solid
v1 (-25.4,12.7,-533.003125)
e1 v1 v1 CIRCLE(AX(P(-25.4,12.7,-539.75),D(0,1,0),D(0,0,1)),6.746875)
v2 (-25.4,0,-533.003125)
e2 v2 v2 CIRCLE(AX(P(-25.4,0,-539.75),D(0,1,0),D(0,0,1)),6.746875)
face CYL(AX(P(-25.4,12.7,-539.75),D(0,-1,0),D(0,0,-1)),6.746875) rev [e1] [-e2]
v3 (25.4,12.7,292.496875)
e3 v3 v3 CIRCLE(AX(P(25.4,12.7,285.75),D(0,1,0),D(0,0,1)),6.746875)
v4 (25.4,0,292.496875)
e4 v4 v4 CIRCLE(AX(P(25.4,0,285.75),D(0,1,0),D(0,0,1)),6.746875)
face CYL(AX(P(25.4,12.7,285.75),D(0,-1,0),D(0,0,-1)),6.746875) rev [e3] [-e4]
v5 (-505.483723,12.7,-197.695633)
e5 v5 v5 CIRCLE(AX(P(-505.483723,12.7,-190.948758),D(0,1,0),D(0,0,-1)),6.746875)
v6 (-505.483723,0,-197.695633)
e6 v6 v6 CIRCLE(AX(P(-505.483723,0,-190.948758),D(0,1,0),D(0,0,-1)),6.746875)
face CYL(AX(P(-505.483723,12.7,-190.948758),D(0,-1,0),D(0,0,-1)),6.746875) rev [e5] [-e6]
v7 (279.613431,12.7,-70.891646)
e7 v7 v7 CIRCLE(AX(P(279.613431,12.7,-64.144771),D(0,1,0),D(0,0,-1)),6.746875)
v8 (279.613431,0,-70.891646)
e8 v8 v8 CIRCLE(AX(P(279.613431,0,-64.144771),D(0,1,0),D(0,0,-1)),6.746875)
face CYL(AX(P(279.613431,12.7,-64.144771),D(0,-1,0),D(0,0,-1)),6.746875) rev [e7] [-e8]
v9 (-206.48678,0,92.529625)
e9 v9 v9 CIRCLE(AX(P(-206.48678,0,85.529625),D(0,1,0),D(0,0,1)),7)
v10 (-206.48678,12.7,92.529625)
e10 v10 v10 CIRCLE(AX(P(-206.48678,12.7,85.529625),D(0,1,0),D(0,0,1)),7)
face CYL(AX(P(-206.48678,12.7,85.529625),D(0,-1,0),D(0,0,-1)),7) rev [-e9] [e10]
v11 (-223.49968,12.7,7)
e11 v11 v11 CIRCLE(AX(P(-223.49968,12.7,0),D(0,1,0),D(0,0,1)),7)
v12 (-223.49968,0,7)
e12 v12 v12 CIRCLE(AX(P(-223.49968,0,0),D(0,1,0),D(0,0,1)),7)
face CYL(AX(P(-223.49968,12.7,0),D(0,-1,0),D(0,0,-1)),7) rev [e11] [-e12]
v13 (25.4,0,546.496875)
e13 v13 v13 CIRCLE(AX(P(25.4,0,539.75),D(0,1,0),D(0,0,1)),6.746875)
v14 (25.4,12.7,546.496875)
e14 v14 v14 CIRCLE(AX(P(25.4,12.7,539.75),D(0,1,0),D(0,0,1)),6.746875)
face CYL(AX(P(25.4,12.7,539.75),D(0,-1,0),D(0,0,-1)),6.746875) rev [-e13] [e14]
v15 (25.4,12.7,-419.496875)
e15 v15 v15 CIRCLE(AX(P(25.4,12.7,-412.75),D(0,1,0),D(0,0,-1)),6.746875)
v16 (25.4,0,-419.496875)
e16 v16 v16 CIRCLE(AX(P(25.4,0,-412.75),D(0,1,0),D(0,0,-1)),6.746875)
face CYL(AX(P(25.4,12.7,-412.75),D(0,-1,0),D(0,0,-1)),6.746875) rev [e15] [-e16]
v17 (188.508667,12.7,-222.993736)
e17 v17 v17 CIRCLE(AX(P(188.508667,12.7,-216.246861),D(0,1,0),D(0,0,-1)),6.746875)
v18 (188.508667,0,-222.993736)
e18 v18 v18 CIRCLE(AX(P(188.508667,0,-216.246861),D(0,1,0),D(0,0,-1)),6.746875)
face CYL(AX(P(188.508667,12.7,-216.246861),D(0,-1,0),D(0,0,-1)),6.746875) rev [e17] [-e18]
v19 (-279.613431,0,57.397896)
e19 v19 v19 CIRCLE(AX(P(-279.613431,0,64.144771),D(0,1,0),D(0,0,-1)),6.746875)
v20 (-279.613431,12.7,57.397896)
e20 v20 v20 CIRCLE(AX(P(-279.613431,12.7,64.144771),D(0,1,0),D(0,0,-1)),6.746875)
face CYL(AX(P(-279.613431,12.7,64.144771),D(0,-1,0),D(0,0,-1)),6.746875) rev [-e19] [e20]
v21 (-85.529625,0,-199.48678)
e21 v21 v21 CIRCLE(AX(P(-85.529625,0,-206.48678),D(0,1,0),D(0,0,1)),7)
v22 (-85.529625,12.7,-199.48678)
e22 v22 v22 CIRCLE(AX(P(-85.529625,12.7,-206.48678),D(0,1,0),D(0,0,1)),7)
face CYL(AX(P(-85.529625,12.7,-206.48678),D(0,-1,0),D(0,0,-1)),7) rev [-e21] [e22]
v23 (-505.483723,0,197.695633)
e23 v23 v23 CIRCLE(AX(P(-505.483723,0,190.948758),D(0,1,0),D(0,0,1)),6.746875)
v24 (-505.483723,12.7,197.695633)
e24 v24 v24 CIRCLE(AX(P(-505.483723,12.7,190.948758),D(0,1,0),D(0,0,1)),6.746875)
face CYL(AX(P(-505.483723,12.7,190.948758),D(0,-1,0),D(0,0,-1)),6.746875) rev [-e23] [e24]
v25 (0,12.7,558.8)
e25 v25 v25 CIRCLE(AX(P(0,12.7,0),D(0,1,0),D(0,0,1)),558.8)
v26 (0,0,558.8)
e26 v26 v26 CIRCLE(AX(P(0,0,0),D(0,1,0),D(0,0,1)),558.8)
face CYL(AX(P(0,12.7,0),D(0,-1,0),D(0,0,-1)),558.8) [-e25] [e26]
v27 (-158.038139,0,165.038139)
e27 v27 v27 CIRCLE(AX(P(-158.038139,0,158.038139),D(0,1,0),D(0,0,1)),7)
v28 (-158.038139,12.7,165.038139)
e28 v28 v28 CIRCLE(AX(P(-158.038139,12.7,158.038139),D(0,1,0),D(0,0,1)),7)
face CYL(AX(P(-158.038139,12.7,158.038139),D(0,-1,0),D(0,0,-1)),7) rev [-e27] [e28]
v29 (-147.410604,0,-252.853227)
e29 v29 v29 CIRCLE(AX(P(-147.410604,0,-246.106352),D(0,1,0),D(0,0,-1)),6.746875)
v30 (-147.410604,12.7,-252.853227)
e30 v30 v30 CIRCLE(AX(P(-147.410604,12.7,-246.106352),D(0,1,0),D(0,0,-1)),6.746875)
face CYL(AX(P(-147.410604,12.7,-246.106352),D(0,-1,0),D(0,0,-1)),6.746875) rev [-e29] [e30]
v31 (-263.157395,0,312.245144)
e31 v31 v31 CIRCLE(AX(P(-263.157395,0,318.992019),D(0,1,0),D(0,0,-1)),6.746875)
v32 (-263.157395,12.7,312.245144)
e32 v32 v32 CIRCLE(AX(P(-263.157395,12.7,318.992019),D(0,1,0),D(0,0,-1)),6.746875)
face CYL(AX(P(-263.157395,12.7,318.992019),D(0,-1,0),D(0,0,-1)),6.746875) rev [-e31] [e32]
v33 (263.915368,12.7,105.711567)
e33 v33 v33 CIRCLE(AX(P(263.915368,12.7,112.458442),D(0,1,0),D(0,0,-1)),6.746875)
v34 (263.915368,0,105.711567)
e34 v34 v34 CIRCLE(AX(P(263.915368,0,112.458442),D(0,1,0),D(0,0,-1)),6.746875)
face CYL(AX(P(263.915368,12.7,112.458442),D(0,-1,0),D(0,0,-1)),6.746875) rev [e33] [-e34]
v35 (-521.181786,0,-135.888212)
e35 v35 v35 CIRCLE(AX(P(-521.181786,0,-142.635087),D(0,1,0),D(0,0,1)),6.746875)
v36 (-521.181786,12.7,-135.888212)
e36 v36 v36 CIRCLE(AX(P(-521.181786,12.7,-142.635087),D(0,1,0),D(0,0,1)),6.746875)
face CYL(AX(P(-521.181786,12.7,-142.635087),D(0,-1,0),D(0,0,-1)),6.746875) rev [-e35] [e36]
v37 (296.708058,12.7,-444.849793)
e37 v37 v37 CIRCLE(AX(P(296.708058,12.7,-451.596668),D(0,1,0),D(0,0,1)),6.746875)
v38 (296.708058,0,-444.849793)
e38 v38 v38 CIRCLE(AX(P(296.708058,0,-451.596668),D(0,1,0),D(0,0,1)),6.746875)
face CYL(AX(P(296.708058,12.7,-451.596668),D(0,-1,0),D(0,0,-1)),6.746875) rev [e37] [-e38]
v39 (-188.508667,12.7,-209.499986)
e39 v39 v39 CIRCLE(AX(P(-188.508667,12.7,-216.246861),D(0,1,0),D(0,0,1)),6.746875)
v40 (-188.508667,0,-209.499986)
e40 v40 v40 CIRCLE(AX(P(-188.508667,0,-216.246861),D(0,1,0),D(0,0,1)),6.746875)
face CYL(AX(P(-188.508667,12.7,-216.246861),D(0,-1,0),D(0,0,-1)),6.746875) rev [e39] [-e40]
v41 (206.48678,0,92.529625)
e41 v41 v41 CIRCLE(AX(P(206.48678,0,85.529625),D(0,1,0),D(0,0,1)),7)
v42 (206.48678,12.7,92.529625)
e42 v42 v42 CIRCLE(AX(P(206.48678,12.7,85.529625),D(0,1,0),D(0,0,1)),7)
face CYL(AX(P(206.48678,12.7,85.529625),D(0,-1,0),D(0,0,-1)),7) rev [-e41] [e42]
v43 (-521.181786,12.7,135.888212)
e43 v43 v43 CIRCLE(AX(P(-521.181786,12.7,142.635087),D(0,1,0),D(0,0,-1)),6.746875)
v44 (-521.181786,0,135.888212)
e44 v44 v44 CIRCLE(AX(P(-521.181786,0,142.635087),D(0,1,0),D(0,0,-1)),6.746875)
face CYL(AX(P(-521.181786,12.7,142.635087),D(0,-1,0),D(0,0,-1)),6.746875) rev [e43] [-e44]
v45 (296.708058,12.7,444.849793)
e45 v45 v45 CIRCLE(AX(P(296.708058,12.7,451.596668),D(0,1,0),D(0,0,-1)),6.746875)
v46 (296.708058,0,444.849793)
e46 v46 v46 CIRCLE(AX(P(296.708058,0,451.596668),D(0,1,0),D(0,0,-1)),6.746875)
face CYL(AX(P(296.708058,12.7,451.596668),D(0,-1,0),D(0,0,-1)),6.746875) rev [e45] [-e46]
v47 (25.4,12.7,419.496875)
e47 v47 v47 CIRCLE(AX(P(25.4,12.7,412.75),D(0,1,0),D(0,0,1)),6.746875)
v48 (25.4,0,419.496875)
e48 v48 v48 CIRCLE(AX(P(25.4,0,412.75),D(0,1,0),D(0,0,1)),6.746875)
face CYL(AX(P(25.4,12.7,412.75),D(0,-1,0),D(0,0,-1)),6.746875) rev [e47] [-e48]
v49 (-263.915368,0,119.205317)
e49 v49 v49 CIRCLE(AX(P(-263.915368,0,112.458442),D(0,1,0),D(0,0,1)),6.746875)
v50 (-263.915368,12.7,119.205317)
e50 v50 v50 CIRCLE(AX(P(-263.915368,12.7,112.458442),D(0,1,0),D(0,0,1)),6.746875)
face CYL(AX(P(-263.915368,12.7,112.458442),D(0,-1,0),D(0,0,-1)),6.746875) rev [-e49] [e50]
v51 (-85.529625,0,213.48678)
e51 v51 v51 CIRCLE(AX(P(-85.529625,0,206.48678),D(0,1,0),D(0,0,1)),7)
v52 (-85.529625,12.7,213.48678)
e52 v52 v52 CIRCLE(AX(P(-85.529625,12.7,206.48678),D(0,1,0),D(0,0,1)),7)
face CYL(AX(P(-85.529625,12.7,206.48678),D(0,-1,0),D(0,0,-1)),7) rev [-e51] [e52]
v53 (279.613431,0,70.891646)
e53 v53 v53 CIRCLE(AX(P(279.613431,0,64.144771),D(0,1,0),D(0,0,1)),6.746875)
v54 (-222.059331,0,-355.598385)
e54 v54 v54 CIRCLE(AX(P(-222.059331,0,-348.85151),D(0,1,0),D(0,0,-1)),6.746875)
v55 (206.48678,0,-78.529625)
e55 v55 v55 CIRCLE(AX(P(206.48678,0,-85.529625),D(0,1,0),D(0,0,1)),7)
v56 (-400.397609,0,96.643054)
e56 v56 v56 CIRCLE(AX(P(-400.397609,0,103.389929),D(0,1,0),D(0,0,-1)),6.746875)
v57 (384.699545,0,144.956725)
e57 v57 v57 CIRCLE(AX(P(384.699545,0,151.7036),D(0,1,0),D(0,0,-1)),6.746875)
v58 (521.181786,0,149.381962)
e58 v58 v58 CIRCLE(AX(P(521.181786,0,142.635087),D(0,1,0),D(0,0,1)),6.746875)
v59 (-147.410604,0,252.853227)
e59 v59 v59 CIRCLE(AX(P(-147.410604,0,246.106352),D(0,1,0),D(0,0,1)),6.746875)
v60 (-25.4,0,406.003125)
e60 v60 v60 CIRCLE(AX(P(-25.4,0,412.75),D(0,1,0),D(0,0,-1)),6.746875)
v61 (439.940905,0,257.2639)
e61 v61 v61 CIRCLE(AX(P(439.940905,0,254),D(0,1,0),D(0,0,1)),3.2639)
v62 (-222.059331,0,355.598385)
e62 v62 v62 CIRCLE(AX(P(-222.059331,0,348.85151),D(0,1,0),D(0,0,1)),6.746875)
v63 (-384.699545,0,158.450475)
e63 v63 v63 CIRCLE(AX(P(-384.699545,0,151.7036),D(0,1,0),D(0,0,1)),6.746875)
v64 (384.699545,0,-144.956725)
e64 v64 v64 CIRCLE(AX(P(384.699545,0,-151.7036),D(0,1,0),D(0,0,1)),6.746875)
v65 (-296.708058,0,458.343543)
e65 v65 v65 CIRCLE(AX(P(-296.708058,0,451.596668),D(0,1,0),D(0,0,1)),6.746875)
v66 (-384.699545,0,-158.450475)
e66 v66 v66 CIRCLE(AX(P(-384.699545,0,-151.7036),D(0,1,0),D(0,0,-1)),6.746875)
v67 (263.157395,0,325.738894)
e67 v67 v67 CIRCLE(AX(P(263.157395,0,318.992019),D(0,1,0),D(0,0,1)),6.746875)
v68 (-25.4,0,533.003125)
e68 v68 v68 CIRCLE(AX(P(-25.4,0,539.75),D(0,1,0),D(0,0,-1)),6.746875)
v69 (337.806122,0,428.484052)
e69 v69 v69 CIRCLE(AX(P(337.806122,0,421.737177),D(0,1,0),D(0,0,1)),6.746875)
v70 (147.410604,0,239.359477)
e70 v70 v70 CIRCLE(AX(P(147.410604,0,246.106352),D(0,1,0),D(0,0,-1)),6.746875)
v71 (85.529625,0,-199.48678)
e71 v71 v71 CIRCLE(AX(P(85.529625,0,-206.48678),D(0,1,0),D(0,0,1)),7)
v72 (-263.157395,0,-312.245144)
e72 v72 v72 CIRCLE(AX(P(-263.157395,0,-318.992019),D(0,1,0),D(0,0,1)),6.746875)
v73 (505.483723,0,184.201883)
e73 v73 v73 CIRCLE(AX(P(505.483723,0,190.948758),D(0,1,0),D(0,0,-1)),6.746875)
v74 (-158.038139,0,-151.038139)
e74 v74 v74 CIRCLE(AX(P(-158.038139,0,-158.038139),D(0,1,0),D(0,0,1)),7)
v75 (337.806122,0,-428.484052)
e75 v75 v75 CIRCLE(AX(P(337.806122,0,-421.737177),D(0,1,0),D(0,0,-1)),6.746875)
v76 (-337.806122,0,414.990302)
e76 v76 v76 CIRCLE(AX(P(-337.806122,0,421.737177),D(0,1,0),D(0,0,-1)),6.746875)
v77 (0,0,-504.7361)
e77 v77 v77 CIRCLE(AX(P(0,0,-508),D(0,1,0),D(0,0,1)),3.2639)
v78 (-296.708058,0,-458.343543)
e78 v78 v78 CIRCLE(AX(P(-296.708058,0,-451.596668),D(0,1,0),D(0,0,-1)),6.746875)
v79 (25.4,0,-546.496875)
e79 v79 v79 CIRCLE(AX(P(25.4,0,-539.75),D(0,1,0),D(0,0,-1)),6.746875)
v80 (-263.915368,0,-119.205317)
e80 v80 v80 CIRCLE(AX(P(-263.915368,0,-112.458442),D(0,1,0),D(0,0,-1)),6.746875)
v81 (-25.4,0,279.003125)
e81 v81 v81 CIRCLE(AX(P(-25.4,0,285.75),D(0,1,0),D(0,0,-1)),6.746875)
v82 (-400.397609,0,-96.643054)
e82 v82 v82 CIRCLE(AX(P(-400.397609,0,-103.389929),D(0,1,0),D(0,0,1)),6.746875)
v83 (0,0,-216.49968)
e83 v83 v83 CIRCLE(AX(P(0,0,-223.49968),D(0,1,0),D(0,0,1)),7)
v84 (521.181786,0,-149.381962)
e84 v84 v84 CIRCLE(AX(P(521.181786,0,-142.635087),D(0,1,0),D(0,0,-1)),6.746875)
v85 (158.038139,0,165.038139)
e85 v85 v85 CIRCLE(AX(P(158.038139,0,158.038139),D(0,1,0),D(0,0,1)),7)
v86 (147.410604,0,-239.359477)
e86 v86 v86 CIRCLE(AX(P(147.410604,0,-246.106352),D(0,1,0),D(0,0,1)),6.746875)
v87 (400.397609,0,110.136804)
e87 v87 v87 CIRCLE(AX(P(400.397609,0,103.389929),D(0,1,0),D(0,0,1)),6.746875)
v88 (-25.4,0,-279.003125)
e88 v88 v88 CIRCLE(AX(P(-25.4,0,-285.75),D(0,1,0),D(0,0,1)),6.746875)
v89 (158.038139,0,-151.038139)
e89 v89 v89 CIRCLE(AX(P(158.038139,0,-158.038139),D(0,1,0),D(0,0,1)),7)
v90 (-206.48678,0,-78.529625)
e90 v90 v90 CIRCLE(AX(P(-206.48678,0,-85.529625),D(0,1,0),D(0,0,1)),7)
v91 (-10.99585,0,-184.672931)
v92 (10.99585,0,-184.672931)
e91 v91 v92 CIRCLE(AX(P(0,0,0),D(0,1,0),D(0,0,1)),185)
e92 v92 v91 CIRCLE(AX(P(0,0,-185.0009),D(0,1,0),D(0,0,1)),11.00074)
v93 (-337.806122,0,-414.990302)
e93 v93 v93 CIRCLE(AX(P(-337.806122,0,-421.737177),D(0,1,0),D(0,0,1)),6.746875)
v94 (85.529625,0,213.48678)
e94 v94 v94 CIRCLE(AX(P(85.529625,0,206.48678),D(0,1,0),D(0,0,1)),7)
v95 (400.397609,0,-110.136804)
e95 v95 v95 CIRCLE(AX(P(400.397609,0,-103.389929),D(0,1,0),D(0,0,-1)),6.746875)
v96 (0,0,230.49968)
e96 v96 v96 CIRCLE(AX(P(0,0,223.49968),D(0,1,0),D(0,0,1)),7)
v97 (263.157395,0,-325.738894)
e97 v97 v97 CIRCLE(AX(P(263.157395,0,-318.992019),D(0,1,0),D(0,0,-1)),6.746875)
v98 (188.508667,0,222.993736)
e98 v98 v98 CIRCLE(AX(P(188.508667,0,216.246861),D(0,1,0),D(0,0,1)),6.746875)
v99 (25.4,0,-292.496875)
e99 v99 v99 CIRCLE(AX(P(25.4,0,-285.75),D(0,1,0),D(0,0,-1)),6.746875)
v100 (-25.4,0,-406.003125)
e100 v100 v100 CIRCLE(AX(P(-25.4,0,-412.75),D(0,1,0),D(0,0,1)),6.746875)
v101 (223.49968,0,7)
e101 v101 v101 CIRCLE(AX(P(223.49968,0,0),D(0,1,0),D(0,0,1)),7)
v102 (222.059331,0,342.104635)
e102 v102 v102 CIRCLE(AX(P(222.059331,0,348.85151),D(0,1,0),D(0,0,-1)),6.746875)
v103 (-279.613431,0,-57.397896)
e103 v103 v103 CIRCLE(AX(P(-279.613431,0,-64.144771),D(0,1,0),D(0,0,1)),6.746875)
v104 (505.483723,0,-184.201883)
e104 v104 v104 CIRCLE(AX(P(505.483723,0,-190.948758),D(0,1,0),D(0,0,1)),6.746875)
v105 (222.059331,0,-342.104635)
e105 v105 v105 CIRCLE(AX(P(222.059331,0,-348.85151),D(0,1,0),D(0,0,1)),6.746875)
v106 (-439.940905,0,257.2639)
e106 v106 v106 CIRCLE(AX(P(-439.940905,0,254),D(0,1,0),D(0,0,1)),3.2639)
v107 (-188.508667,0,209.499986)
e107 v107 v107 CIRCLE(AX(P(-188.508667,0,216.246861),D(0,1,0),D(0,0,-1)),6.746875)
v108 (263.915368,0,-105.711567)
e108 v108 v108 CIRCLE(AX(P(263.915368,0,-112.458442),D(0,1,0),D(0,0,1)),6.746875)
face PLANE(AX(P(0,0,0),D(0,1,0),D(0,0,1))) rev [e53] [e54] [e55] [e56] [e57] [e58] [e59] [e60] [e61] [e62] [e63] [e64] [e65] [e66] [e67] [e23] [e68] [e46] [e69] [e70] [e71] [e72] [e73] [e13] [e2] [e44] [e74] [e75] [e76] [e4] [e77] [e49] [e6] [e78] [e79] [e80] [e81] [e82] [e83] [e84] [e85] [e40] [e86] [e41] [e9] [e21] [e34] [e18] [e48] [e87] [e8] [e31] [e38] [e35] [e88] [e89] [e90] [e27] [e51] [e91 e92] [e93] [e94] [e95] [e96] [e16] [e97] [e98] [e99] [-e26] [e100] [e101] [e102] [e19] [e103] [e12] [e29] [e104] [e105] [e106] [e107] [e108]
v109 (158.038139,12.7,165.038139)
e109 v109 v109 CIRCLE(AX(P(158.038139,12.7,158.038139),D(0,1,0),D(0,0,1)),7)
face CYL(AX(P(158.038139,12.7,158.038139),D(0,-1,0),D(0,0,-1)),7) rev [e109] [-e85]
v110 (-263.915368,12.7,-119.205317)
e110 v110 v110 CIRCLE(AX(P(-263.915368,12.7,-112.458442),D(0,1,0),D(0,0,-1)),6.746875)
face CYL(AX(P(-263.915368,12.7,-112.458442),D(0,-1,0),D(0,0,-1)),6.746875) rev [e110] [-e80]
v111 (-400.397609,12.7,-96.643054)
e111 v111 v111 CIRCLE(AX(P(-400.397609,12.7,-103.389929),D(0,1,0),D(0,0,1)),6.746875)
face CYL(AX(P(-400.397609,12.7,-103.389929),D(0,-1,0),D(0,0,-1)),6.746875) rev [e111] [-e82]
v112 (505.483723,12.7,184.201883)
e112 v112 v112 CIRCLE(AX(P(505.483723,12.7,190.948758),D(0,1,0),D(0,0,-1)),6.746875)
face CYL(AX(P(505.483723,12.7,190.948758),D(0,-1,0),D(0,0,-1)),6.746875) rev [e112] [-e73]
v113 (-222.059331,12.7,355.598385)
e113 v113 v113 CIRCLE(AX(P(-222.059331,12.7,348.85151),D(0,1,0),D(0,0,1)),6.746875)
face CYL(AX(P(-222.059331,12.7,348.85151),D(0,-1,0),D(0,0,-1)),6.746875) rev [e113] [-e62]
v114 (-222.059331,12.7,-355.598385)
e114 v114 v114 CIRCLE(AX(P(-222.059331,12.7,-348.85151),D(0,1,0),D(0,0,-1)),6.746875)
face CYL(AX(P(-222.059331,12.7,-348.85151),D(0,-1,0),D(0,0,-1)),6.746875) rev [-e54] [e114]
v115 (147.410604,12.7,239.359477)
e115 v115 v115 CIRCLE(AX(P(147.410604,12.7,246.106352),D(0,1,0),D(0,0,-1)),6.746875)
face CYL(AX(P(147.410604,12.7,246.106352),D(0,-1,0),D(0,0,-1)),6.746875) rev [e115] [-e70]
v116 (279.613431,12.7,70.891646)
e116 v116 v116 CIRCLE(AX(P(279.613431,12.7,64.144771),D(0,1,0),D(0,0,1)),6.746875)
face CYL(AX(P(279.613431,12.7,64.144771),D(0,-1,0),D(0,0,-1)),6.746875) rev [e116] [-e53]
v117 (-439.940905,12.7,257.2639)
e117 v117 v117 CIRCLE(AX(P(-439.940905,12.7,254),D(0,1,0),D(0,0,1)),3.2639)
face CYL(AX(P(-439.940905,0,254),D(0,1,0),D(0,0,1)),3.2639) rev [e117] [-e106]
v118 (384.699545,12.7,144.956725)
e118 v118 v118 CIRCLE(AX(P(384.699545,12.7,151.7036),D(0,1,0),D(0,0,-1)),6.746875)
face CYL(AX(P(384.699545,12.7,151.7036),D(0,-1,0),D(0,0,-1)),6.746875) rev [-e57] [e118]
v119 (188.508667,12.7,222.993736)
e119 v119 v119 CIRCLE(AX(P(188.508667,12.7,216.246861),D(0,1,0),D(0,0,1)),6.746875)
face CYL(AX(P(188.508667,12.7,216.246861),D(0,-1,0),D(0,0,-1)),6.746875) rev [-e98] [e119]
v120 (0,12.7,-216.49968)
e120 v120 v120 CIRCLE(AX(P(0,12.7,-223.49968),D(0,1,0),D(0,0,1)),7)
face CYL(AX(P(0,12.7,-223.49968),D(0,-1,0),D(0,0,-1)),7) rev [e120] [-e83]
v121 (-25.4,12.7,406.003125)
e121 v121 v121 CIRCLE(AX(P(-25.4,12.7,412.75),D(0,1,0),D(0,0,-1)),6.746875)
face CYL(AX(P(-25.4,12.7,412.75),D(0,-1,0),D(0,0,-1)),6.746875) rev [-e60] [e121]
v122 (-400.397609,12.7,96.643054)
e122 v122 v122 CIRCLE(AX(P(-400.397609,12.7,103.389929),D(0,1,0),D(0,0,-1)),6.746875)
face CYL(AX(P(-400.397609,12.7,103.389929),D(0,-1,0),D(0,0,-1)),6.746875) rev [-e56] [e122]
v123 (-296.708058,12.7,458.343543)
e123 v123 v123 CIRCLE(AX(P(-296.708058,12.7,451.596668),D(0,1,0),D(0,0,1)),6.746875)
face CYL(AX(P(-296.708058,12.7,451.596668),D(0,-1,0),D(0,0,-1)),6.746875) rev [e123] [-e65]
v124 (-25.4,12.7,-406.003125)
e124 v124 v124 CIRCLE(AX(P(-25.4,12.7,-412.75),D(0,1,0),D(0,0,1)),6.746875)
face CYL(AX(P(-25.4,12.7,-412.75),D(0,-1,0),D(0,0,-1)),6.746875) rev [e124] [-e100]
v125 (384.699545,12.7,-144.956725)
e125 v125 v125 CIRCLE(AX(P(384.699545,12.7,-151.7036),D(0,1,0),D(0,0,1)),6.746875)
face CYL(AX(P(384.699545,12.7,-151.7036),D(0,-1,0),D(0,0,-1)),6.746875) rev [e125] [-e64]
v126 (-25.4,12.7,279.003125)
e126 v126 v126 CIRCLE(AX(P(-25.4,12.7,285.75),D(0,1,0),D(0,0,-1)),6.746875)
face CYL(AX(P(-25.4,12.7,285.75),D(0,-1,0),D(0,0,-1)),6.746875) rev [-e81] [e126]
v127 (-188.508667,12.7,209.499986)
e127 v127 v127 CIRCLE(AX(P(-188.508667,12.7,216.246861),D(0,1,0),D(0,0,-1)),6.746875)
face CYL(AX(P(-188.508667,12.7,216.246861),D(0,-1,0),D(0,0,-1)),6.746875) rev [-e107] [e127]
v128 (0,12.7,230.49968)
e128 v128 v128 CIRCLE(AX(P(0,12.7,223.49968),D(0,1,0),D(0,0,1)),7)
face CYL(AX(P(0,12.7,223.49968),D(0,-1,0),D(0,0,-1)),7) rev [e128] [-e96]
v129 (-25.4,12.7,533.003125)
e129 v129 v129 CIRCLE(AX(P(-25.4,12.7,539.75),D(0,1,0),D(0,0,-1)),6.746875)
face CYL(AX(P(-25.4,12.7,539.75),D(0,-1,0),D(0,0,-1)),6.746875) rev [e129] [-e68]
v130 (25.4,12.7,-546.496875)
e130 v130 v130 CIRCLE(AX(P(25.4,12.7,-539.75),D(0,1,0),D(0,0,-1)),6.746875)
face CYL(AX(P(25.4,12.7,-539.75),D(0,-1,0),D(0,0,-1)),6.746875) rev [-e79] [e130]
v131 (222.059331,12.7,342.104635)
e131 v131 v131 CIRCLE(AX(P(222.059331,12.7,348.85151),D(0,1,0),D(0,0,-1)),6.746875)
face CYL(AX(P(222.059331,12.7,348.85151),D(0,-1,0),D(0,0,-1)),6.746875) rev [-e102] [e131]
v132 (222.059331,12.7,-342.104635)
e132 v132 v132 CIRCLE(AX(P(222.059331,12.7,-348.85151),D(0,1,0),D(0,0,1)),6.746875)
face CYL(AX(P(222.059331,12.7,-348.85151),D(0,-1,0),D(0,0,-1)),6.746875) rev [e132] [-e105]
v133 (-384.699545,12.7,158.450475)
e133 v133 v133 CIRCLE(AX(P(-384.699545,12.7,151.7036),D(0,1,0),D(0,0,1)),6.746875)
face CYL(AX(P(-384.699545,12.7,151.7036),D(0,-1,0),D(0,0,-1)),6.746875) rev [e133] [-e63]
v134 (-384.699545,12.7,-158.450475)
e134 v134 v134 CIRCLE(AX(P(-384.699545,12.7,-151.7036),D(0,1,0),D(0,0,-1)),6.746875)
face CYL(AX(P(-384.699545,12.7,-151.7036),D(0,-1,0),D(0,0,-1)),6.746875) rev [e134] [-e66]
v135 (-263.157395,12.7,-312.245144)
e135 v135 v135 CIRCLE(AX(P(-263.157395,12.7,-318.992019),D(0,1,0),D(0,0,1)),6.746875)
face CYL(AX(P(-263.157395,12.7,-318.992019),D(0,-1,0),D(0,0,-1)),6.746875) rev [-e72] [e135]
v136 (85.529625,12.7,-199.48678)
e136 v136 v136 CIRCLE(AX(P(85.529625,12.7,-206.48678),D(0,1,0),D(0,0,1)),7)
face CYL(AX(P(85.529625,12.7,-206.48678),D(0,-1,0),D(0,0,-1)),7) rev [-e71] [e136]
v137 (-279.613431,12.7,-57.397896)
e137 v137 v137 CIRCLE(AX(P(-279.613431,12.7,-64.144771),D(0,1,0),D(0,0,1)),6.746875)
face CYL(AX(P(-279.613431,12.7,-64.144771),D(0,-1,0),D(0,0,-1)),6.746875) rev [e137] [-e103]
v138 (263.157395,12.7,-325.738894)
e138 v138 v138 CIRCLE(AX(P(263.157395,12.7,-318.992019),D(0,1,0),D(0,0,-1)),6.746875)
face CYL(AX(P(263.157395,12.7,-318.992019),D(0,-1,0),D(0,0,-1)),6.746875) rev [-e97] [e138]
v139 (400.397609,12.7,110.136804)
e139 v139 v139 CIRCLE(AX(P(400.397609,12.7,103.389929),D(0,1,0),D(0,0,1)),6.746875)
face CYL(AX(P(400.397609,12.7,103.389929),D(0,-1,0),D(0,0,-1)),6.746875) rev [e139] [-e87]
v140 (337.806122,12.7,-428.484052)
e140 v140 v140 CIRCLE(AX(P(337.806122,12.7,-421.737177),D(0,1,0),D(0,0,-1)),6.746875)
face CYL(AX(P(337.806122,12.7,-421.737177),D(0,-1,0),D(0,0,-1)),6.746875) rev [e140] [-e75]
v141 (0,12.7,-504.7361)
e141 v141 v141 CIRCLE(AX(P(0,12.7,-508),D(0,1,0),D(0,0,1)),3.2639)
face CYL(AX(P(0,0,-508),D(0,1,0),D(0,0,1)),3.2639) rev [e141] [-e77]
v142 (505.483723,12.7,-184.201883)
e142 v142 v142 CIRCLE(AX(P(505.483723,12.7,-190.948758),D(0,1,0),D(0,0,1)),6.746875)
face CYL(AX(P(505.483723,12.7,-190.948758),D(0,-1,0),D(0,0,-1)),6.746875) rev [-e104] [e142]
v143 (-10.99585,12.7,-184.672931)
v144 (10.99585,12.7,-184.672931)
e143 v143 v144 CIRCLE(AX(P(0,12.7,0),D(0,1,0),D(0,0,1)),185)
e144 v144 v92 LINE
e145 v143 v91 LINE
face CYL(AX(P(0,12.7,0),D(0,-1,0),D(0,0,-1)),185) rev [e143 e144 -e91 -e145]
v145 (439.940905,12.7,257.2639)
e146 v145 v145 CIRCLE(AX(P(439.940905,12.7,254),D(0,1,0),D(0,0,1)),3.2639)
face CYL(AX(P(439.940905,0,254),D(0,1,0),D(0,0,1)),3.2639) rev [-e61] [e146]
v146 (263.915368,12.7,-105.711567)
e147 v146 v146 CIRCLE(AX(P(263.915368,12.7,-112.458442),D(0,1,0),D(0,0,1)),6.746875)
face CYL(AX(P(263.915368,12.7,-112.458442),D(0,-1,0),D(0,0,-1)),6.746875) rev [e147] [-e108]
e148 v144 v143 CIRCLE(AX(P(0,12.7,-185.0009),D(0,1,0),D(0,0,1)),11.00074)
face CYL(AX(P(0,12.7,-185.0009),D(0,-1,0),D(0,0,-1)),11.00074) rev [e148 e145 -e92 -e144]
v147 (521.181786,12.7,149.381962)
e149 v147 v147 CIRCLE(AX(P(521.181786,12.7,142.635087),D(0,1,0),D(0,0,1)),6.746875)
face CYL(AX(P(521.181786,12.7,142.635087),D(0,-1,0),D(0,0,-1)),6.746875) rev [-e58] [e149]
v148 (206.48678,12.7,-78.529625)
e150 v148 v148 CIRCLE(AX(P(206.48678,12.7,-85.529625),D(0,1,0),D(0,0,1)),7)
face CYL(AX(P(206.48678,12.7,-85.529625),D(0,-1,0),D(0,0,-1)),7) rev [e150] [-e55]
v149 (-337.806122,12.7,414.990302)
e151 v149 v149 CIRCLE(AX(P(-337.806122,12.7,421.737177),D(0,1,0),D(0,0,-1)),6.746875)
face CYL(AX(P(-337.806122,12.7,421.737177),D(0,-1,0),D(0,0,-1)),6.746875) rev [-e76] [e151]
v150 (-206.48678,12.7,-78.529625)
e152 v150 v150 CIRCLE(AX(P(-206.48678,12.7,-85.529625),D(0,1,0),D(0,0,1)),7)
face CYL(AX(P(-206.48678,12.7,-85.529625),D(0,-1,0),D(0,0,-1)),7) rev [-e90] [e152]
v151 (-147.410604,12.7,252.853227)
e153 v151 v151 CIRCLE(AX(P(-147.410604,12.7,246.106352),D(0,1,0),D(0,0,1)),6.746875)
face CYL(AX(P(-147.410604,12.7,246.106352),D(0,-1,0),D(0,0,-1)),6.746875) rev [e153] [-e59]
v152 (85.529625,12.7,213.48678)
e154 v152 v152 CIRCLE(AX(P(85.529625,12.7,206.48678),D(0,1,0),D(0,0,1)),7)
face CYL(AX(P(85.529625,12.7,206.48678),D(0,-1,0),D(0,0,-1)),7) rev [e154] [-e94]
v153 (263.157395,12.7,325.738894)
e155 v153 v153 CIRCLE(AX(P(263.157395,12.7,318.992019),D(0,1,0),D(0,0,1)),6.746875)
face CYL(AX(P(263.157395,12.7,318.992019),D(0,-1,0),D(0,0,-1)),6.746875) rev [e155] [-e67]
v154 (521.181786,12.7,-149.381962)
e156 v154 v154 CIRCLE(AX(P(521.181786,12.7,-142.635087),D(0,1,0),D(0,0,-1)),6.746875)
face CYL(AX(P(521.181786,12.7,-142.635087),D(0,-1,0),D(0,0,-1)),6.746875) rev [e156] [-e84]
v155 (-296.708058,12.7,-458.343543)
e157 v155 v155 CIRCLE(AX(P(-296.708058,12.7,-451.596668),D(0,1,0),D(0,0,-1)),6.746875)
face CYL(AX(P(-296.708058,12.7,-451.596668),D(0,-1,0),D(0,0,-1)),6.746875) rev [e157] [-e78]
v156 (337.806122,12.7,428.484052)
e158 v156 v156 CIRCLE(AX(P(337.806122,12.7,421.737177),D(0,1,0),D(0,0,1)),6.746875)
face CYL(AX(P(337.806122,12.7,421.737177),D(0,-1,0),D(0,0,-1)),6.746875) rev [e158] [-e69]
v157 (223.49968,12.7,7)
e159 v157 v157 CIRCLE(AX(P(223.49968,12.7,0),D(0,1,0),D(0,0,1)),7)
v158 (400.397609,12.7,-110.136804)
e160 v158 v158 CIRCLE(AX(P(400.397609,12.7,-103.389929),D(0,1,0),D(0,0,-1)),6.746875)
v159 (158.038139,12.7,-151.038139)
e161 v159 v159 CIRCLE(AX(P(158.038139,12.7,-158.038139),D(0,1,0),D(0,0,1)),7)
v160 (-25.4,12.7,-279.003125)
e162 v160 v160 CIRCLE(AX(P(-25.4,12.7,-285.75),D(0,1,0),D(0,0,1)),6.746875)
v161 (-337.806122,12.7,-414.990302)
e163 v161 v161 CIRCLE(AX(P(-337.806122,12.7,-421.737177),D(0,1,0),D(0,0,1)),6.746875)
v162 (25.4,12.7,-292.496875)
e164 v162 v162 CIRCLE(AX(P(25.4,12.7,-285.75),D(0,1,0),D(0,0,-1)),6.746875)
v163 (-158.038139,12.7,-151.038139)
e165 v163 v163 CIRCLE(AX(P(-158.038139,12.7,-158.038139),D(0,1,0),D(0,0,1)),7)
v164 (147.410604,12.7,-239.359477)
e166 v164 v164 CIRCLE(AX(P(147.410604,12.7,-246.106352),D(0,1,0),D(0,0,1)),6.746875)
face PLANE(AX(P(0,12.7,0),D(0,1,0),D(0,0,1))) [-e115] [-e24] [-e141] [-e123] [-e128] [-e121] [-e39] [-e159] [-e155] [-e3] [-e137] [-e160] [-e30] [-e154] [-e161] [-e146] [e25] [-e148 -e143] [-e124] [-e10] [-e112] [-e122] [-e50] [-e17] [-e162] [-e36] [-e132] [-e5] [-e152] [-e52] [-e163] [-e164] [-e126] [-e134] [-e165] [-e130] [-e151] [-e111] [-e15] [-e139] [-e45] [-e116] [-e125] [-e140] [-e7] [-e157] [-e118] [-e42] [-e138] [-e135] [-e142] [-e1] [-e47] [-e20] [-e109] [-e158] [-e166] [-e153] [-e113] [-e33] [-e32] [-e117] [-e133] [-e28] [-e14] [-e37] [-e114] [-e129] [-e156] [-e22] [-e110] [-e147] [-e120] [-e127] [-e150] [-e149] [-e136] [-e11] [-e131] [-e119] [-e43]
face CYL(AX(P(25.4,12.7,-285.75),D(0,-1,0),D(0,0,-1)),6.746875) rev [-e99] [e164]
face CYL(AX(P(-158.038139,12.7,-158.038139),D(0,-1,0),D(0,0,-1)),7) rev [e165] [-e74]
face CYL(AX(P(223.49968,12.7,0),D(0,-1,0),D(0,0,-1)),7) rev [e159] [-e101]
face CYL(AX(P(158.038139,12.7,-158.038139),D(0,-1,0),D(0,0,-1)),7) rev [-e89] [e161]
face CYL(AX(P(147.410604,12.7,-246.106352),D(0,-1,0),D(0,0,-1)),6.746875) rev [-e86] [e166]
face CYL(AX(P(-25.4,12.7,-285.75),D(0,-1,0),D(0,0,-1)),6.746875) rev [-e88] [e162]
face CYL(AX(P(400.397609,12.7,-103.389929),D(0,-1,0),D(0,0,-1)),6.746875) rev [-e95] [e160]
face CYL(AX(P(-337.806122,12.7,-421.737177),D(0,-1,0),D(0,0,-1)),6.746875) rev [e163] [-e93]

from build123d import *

# Parameters (mm, degrees)
BOSS_EXTRUDE1_OUTLINE_R   = 558.8
BOSS_EXTRUDE1_OUTLINE_R_2 = 6.746875
BOSS_EXTRUDE1_OUTLINE_R_3 = 7
BOSS_EXTRUDE1_DEPTH       = 12.7
SKETCH2_R                 = 3.2639
CUT_EXTRUDE1_DEPTH        = 791.364580431


# Read off the part's stored shape, not the designer's step: Boss-Extrude1
with BuildPart() as part:
    # Boss-Extrude1 outline → Boss-Extrude1 (new body)
    with BuildSketch(Plane(origin=(0, 0, 0), x_dir=(1, 0, 0), z_dir=(0, 1, 0))):
        Circle(BOSS_EXTRUDE1_OUTLINE_R)
        with Locations((-337.806121582, -421.737177306)):
            Circle(BOSS_EXTRUDE1_OUTLINE_R_2, mode=Mode.SUBTRACT)
        with Locations((-296.708058268, -451.596668122)):
            Circle(BOSS_EXTRUDE1_OUTLINE_R_2, mode=Mode.SUBTRACT)
        with Locations((-25.4, -539.75)):
            Circle(BOSS_EXTRUDE1_OUTLINE_R_2, mode=Mode.SUBTRACT)
        with Locations((-263.157394541, -318.99201902)):
            Circle(BOSS_EXTRUDE1_OUTLINE_R_2, mode=Mode.SUBTRACT)
        with Locations((-222.059331227, -348.851509836)):
            Circle(BOSS_EXTRUDE1_OUTLINE_R_2, mode=Mode.SUBTRACT)
        with Locations((-25.4, -412.75)):
            Circle(BOSS_EXTRUDE1_OUTLINE_R_2, mode=Mode.SUBTRACT)
        with Locations((-25.4, -285.75)):
            Circle(BOSS_EXTRUDE1_OUTLINE_R_2, mode=Mode.SUBTRACT)
        with Locations((-505.483723013, -190.948758228)):
            Circle(BOSS_EXTRUDE1_OUTLINE_R_2, mode=Mode.SUBTRACT)
        with Locations((-521.181786327, -142.6350872)):
            Circle(BOSS_EXTRUDE1_OUTLINE_R_2, mode=Mode.SUBTRACT)
        with Locations((-384.699545444, -151.703599942)):
            Circle(BOSS_EXTRUDE1_OUTLINE_R_2, mode=Mode.SUBTRACT)
        with Locations((-400.397608758, -103.389928914)):
            Circle(BOSS_EXTRUDE1_OUTLINE_R_2, mode=Mode.SUBTRACT)
        with Locations((-279.613431188, -64.144770629)):
            Circle(BOSS_EXTRUDE1_OUTLINE_R_2, mode=Mode.SUBTRACT)
        with Locations((-147.410604185, -246.106351551)):
            Circle(BOSS_EXTRUDE1_OUTLINE_R_2, mode=Mode.SUBTRACT)
        with Locations((-188.5086675, -216.246860734)):
            Circle(BOSS_EXTRUDE1_OUTLINE_R_2, mode=Mode.SUBTRACT)
        with Locations((-158.038139321, -158.038139321)):
            Circle(BOSS_EXTRUDE1_OUTLINE_R_3, mode=Mode.SUBTRACT)
        with Locations((-85.529624675, -206.486779875)):
            Circle(BOSS_EXTRUDE1_OUTLINE_R_3, mode=Mode.SUBTRACT)
        with Locations((-263.915367874, -112.458441657)):
            Circle(BOSS_EXTRUDE1_OUTLINE_R_2, mode=Mode.SUBTRACT)
        with Locations((-206.486779875, -85.529624675)):
            Circle(BOSS_EXTRUDE1_OUTLINE_R_3, mode=Mode.SUBTRACT)
        with Locations((25.4, -539.75)):
            Circle(BOSS_EXTRUDE1_OUTLINE_R_2, mode=Mode.SUBTRACT)
        with Locations((25.4, -412.75)):
            Circle(BOSS_EXTRUDE1_OUTLINE_R_2, mode=Mode.SUBTRACT)
        with Locations((25.4, -285.75)):
            Circle(BOSS_EXTRUDE1_OUTLINE_R_2, mode=Mode.SUBTRACT)
        with Locations((222.059331227, -348.851509836)):
            Circle(BOSS_EXTRUDE1_OUTLINE_R_2, mode=Mode.SUBTRACT)
        with Locations((263.157394541, -318.99201902)):
            Circle(BOSS_EXTRUDE1_OUTLINE_R_2, mode=Mode.SUBTRACT)
        with Locations((296.708058268, -451.596668122)):
            Circle(BOSS_EXTRUDE1_OUTLINE_R_2, mode=Mode.SUBTRACT)
        with Locations((337.806121582, -421.737177306)):
            Circle(BOSS_EXTRUDE1_OUTLINE_R_2, mode=Mode.SUBTRACT)
        with Locations((0, -223.49968)):
            Circle(BOSS_EXTRUDE1_OUTLINE_R_3, mode=Mode.SUBTRACT)
        with Locations((85.529624675, -206.486779875)):
            Circle(BOSS_EXTRUDE1_OUTLINE_R_3, mode=Mode.SUBTRACT)
        with Locations((147.410604185, -246.106351551)):
            Circle(BOSS_EXTRUDE1_OUTLINE_R_2, mode=Mode.SUBTRACT)
        with Locations((188.5086675, -216.246860734)):
            Circle(BOSS_EXTRUDE1_OUTLINE_R_2, mode=Mode.SUBTRACT)
        with Locations((158.038139321, -158.038139321)):
            Circle(BOSS_EXTRUDE1_OUTLINE_R_3, mode=Mode.SUBTRACT)
        with Locations((206.486779875, -85.529624675)):
            Circle(BOSS_EXTRUDE1_OUTLINE_R_3, mode=Mode.SUBTRACT)
        with Locations((263.915367874, -112.458441657)):
            Circle(BOSS_EXTRUDE1_OUTLINE_R_2, mode=Mode.SUBTRACT)
        with Locations((384.699545444, -151.703599942)):
            Circle(BOSS_EXTRUDE1_OUTLINE_R_2, mode=Mode.SUBTRACT)
        with Locations((505.483723013, -190.948758228)):
            Circle(BOSS_EXTRUDE1_OUTLINE_R_2, mode=Mode.SUBTRACT)
        with Locations((521.181786327, -142.6350872)):
            Circle(BOSS_EXTRUDE1_OUTLINE_R_2, mode=Mode.SUBTRACT)
        with Locations((400.397608758, -103.389928914)):
            Circle(BOSS_EXTRUDE1_OUTLINE_R_2, mode=Mode.SUBTRACT)
        with Locations((279.613431188, -64.144770629)):
            Circle(BOSS_EXTRUDE1_OUTLINE_R_2, mode=Mode.SUBTRACT)
        with Locations((-279.613431188, 64.144770629)):
            Circle(BOSS_EXTRUDE1_OUTLINE_R_2, mode=Mode.SUBTRACT)
        with Locations((-400.397608758, 103.389928914)):
            Circle(BOSS_EXTRUDE1_OUTLINE_R_2, mode=Mode.SUBTRACT)
        with Locations((-521.181786327, 142.6350872)):
            Circle(BOSS_EXTRUDE1_OUTLINE_R_2, mode=Mode.SUBTRACT)
        with Locations((-505.483723013, 190.948758228)):
            Circle(BOSS_EXTRUDE1_OUTLINE_R_2, mode=Mode.SUBTRACT)
        with Locations((-384.699545444, 151.703599942)):
            Circle(BOSS_EXTRUDE1_OUTLINE_R_2, mode=Mode.SUBTRACT)
        with Locations((-223.49968, 0)):
            Circle(BOSS_EXTRUDE1_OUTLINE_R_3, mode=Mode.SUBTRACT)
        with Locations((-263.915367874, 112.458441657)):
            Circle(BOSS_EXTRUDE1_OUTLINE_R_2, mode=Mode.SUBTRACT)
        with Locations((-206.486779875, 85.529624675)):
            Circle(BOSS_EXTRUDE1_OUTLINE_R_3, mode=Mode.SUBTRACT)
        with Locations((-158.038139321, 158.038139321)):
            Circle(BOSS_EXTRUDE1_OUTLINE_R_3, mode=Mode.SUBTRACT)
        with Locations((-188.5086675, 216.246860734)):
            Circle(BOSS_EXTRUDE1_OUTLINE_R_2, mode=Mode.SUBTRACT)
        with Locations((-147.410604185, 246.106351551)):
            Circle(BOSS_EXTRUDE1_OUTLINE_R_2, mode=Mode.SUBTRACT)
        with Locations((-85.529624675, 206.486779875)):
            Circle(BOSS_EXTRUDE1_OUTLINE_R_3, mode=Mode.SUBTRACT)
        with Locations((-337.806121582, 421.737177306)):
            Circle(BOSS_EXTRUDE1_OUTLINE_R_2, mode=Mode.SUBTRACT)
        with Locations((-296.708058268, 451.596668122)):
            Circle(BOSS_EXTRUDE1_OUTLINE_R_2, mode=Mode.SUBTRACT)
        with Locations((-263.157394541, 318.99201902)):
            Circle(BOSS_EXTRUDE1_OUTLINE_R_2, mode=Mode.SUBTRACT)
        with Locations((-222.059331227, 348.851509836)):
            Circle(BOSS_EXTRUDE1_OUTLINE_R_2, mode=Mode.SUBTRACT)
        with Locations((-25.4, 285.75)):
            Circle(BOSS_EXTRUDE1_OUTLINE_R_2, mode=Mode.SUBTRACT)
        with Locations((-25.4, 412.75)):
            Circle(BOSS_EXTRUDE1_OUTLINE_R_2, mode=Mode.SUBTRACT)
        with Locations((-25.4, 539.75)):
            Circle(BOSS_EXTRUDE1_OUTLINE_R_2, mode=Mode.SUBTRACT)
        with BuildLine():
            ThreePointArc((10.995849972, 184.672930565), (0, -185), (-10.995849972, 184.672930565))
            ThreePointArc((-10.995849972, 184.672930565), (0, 196.00164), (10.995849972, 184.672930565))
        make_face(mode=Mode.SUBTRACT)
        with Locations((223.49968, 0)):
            Circle(BOSS_EXTRUDE1_OUTLINE_R_3, mode=Mode.SUBTRACT)
        with Locations((206.486779875, 85.529624675)):
            Circle(BOSS_EXTRUDE1_OUTLINE_R_3, mode=Mode.SUBTRACT)
        with Locations((263.915367874, 112.458441657)):
            Circle(BOSS_EXTRUDE1_OUTLINE_R_2, mode=Mode.SUBTRACT)
        with Locations((85.529624675, 206.486779875)):
            Circle(BOSS_EXTRUDE1_OUTLINE_R_3, mode=Mode.SUBTRACT)
        with Locations((0, 223.49968)):
            Circle(BOSS_EXTRUDE1_OUTLINE_R_3, mode=Mode.SUBTRACT)
        with Locations((158.038139321, 158.038139321)):
            Circle(BOSS_EXTRUDE1_OUTLINE_R_3, mode=Mode.SUBTRACT)
        with Locations((188.5086675, 216.246860734)):
            Circle(BOSS_EXTRUDE1_OUTLINE_R_2, mode=Mode.SUBTRACT)
        with Locations((147.410604185, 246.106351551)):
            Circle(BOSS_EXTRUDE1_OUTLINE_R_2, mode=Mode.SUBTRACT)
        with Locations((279.613431188, 64.144770629)):
            Circle(BOSS_EXTRUDE1_OUTLINE_R_2, mode=Mode.SUBTRACT)
        with Locations((400.397608758, 103.389928914)):
            Circle(BOSS_EXTRUDE1_OUTLINE_R_2, mode=Mode.SUBTRACT)
        with Locations((384.699545444, 151.703599942)):
            Circle(BOSS_EXTRUDE1_OUTLINE_R_2, mode=Mode.SUBTRACT)
        with Locations((521.181786327, 142.6350872)):
            Circle(BOSS_EXTRUDE1_OUTLINE_R_2, mode=Mode.SUBTRACT)
        with Locations((505.483723013, 190.948758228)):
            Circle(BOSS_EXTRUDE1_OUTLINE_R_2, mode=Mode.SUBTRACT)
        with Locations((25.4, 285.75)):
            Circle(BOSS_EXTRUDE1_OUTLINE_R_2, mode=Mode.SUBTRACT)
        with Locations((25.4, 412.75)):
            Circle(BOSS_EXTRUDE1_OUTLINE_R_2, mode=Mode.SUBTRACT)
        with Locations((222.059331227, 348.851509836)):
            Circle(BOSS_EXTRUDE1_OUTLINE_R_2, mode=Mode.SUBTRACT)
        with Locations((263.157394541, 318.99201902)):
            Circle(BOSS_EXTRUDE1_OUTLINE_R_2, mode=Mode.SUBTRACT)
        with Locations((25.4, 539.75)):
            Circle(BOSS_EXTRUDE1_OUTLINE_R_2, mode=Mode.SUBTRACT)
        with Locations((296.708058268, 451.596668122)):
            Circle(BOSS_EXTRUDE1_OUTLINE_R_2, mode=Mode.SUBTRACT)
        with Locations((337.806121582, 421.737177306)):
            Circle(BOSS_EXTRUDE1_OUTLINE_R_2, mode=Mode.SUBTRACT)
    extrude(amount=BOSS_EXTRUDE1_DEPTH)

    # Sketch2 → Cut-Extrude1 (cut, through all)
    with BuildSketch(Plane(origin=(0, 12.7, 0), x_dir=(1, 0, 0), z_dir=(0, 1, 0))):
        with Locations(Location((0, 508, 0), (0, 0, 270))):
            Circle(SKETCH2_R)
        with Locations(Location((-439.940905122, -254, 0), (0, 0, 270))):
            Circle(SKETCH2_R)
        with Locations(Location((439.940905122, -254, 0), (0, 0, 270))):
            Circle(SKETCH2_R)
    extrude(amount=-CUT_EXTRUDE1_DEPTH, mode=Mode.SUBTRACT)


solid = part.part
